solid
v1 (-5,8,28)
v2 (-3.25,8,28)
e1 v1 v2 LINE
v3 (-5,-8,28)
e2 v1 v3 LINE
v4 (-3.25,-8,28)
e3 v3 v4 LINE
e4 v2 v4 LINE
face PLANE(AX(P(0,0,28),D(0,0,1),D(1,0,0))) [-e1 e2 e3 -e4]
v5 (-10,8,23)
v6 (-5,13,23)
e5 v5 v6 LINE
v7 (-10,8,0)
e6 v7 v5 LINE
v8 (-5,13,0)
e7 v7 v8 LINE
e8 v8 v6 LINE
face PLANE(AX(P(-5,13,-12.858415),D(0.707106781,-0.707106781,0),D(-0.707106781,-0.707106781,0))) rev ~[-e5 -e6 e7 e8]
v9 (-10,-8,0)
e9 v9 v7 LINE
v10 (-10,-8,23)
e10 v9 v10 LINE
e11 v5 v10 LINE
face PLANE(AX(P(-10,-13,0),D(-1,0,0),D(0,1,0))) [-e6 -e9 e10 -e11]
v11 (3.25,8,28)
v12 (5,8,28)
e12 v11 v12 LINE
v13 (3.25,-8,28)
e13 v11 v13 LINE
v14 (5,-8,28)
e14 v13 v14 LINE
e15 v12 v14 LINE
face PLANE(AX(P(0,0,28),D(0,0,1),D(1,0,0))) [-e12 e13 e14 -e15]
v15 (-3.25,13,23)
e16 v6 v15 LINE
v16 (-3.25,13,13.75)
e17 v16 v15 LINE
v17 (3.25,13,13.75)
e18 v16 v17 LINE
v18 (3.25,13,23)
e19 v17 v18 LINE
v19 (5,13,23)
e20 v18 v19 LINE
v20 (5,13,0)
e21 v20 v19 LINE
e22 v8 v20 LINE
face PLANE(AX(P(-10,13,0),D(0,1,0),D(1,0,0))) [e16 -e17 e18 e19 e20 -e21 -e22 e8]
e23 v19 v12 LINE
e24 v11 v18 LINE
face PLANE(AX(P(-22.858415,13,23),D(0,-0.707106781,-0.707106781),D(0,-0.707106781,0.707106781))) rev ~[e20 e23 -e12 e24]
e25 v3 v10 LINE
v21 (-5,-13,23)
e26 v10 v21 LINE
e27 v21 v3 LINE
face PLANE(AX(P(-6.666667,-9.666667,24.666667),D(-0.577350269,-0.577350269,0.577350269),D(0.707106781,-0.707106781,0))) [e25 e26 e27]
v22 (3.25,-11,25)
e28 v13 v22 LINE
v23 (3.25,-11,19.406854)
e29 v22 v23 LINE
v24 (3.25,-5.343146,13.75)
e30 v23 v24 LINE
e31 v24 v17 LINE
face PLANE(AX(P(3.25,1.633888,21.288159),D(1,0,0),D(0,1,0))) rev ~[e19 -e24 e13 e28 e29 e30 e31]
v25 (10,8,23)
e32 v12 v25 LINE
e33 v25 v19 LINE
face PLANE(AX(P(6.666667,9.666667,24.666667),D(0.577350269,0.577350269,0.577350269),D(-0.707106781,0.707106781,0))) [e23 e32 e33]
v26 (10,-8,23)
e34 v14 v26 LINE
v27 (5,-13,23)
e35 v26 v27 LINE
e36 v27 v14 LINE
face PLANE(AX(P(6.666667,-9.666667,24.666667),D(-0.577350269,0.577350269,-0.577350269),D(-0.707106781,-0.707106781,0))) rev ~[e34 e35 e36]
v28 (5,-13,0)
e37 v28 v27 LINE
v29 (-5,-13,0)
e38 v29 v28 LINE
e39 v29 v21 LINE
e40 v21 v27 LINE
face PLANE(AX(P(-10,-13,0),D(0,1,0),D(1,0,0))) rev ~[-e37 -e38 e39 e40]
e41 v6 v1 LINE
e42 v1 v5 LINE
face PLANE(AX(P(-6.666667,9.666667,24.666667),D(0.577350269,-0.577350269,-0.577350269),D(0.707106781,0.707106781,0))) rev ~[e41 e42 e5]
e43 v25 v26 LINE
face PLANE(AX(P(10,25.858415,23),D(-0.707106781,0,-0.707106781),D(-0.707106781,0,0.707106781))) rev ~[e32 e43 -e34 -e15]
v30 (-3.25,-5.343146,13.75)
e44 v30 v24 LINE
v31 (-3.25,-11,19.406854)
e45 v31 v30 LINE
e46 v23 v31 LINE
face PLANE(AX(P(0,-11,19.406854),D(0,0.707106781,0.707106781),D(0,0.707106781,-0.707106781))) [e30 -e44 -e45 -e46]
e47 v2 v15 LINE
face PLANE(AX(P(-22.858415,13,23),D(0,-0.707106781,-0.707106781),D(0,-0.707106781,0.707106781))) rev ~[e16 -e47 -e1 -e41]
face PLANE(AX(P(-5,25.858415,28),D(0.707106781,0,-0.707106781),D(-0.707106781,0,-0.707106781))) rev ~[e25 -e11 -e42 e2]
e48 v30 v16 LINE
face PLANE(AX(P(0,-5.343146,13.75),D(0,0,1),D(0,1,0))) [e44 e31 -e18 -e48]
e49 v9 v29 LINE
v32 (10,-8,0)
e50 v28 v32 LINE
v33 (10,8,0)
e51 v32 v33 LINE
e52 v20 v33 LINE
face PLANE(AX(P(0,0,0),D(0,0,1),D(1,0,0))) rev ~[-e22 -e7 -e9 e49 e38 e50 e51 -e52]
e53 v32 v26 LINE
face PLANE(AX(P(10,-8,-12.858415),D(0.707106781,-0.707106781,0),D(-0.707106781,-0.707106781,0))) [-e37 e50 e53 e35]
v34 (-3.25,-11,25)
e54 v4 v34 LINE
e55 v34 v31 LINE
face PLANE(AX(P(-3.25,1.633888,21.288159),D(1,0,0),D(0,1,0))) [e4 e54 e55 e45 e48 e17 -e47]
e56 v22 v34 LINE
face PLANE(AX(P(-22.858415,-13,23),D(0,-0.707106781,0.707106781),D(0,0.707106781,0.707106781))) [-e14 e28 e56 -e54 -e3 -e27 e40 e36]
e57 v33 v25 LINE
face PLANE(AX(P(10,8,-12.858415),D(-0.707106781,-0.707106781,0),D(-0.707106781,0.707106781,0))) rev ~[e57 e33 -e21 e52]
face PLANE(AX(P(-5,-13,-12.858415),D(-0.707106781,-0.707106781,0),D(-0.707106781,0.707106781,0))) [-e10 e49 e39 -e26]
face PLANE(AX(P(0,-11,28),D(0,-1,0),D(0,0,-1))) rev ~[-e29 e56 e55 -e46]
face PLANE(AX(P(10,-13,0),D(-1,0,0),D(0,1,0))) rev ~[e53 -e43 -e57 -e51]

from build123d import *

# Parameters (mm, degrees)
F0_W          = 20
F0_H          = 26
F1_DEPTH      = 28
F3_DEPTH      = 3.25
F3_DEPTH_BACK = 3.25
F4_T1_DEPTH   = 6.3508529611
F4_T3_DEPTH   = 6.3508529611
F4_T5_DEPTH   = 6.3508529611
F4_T7_DEPTH   = 6.3508529611
F4_T9_DEPTH   = 51.7168298797
F4_T11_DEPTH  = 45.7168298797
F4_T13_DEPTH  = 53.7168298797
F4_T15_DEPTH  = 32.4668298797
F4_T17_DEPTH  = 32.4668298797


# Not quite as in the source:
# - a fillet or chamfer that OpenCascade refuses, or shapes differently, is made with other operations: its cross-section is extruded or revolved along the edge and cut away or added


with BuildPart() as f1:
    # F0 (on Top) → F1 (new body)
    with BuildSketch(Plane.XY):
        Rectangle(F0_W, F0_H)
    extrude(amount=F1_DEPTH)

    # F2 (on Right) → F3 (cut, two sides)
    with BuildSketch(Plane.YZ) as f3_sk:
        Polygon((13, 28), (-11, 28), (-11, 19.4068542495), (-5.3431457505, 13.75), (13, 13.75), align=None)
    extrude(amount=-F3_DEPTH, mode=Mode.SUBTRACT)
    extrude(f3_sk.sketch, amount=F3_DEPTH_BACK, mode=Mode.SUBTRACT)

    # F4: chamfer of 5 on 9 edges, made by hand

    # F4_s2 → F4_t1 (cut)
    with BuildSketch(Plane(origin=(13.6666666667, -13.6666666667, 13.6666666667), x_dir=(0.7071067812, 0.7071067812, 0), z_dir=(0.5773502692, -0.5773502692, 0.5773502692))):
        Polygon((1.4142135624, 11.430952133), (-5.6568542495, 11.430952133), (-2.1213203436, 17.5546764899), align=None)
    extrude(amount=F4_T1_DEPTH, mode=Mode.SUBTRACT)

    # F4_s4 → F4_t3 (cut)
    with BuildSketch(Plane(origin=(13.6666666667, 13.6666666667, 13.6666666667), x_dir=(-0.7071067812, 0.7071067812, 0), z_dir=(0.5773502692, 0.5773502692, 0.5773502692))):
        Polygon((-1.4142135624, 11.430952133), (5.6568542495, 11.430952133), (2.1213203436, 17.5546764899), align=None)
    extrude(amount=F4_T3_DEPTH, mode=Mode.SUBTRACT)

    # F4_s6 → F4_t5 (cut)
    with BuildSketch(Plane(origin=(-13.6666666667, -13.6666666667, 13.6666666667), x_dir=(0.7071067812, -0.7071067812, 0), z_dir=(-0.5773502692, -0.5773502692, 0.5773502692))):
        Polygon((5.6568542495, 11.430952133), (2.1213203436, 17.5546764899), (-1.4142135624, 11.430952133), align=None)
    extrude(amount=F4_T5_DEPTH, mode=Mode.SUBTRACT)

    # F4_s8 → F4_t7 (cut)
    with BuildSketch(Plane(origin=(-13.6666666667, 13.6666666667, 13.6666666667), x_dir=(-0.7071067812, -0.7071067812, 0), z_dir=(-0.5773502692, 0.5773502692, 0.5773502692))):
        Polygon((-5.6568542495, 11.430952133), (-2.1213203436, 17.5546764899), (1.4142135624, 11.430952133), align=None)
    extrude(amount=F4_T7_DEPTH, mode=Mode.SUBTRACT)

    # F4_s10 → F4_t9 (cut)
    with BuildSketch(Plane.XZ.offset(-25.8584149398)):
        Polygon((10, 23), (5, 28), (10, 28), align=None)
        Polygon((-5, 28), (-10, 23), (-10, 28), align=None)
    extrude(amount=F4_T9_DEPTH, mode=Mode.SUBTRACT)

    # F4_s12 → F4_t11 (cut)
    with BuildSketch(Plane.YZ.offset(-22.8584149398)):
        Polygon((-13, 23), (-8, 28), (-13, 28), align=None)
    extrude(amount=F4_T11_DEPTH, mode=Mode.SUBTRACT)

    # F4_s14 → F4_t13 (cut)
    with BuildSketch(Plane.XY.offset(-12.8584149398)):
        Polygon((10, -8), (5, -13), (10, -13), align=None)
        Polygon((-5, -13), (-10, -8), (-10, -13), align=None)
        Polygon((10, 8), (5, 13), (10, 13), align=None)
        Polygon((-5, 13), (-10, 8), (-10, 13), align=None)
    extrude(amount=F4_T13_DEPTH, mode=Mode.SUBTRACT)

    # F4_s16 → F4_t15 (cut)
    with BuildSketch(Plane.YZ.offset(-22.8584149398)):
        Polygon((13, 23), (8, 28), (13, 28), align=None)
    extrude(amount=F4_T15_DEPTH, mode=Mode.SUBTRACT)

    # F4_s18 → F4_t17 (cut)
    with BuildSketch(Plane.YZ.offset(-9.6084149398)):
        Polygon((13, 23), (8, 28), (13, 28), align=None)
    extrude(amount=F4_T17_DEPTH, mode=Mode.SUBTRACT)


solid = f1.part
